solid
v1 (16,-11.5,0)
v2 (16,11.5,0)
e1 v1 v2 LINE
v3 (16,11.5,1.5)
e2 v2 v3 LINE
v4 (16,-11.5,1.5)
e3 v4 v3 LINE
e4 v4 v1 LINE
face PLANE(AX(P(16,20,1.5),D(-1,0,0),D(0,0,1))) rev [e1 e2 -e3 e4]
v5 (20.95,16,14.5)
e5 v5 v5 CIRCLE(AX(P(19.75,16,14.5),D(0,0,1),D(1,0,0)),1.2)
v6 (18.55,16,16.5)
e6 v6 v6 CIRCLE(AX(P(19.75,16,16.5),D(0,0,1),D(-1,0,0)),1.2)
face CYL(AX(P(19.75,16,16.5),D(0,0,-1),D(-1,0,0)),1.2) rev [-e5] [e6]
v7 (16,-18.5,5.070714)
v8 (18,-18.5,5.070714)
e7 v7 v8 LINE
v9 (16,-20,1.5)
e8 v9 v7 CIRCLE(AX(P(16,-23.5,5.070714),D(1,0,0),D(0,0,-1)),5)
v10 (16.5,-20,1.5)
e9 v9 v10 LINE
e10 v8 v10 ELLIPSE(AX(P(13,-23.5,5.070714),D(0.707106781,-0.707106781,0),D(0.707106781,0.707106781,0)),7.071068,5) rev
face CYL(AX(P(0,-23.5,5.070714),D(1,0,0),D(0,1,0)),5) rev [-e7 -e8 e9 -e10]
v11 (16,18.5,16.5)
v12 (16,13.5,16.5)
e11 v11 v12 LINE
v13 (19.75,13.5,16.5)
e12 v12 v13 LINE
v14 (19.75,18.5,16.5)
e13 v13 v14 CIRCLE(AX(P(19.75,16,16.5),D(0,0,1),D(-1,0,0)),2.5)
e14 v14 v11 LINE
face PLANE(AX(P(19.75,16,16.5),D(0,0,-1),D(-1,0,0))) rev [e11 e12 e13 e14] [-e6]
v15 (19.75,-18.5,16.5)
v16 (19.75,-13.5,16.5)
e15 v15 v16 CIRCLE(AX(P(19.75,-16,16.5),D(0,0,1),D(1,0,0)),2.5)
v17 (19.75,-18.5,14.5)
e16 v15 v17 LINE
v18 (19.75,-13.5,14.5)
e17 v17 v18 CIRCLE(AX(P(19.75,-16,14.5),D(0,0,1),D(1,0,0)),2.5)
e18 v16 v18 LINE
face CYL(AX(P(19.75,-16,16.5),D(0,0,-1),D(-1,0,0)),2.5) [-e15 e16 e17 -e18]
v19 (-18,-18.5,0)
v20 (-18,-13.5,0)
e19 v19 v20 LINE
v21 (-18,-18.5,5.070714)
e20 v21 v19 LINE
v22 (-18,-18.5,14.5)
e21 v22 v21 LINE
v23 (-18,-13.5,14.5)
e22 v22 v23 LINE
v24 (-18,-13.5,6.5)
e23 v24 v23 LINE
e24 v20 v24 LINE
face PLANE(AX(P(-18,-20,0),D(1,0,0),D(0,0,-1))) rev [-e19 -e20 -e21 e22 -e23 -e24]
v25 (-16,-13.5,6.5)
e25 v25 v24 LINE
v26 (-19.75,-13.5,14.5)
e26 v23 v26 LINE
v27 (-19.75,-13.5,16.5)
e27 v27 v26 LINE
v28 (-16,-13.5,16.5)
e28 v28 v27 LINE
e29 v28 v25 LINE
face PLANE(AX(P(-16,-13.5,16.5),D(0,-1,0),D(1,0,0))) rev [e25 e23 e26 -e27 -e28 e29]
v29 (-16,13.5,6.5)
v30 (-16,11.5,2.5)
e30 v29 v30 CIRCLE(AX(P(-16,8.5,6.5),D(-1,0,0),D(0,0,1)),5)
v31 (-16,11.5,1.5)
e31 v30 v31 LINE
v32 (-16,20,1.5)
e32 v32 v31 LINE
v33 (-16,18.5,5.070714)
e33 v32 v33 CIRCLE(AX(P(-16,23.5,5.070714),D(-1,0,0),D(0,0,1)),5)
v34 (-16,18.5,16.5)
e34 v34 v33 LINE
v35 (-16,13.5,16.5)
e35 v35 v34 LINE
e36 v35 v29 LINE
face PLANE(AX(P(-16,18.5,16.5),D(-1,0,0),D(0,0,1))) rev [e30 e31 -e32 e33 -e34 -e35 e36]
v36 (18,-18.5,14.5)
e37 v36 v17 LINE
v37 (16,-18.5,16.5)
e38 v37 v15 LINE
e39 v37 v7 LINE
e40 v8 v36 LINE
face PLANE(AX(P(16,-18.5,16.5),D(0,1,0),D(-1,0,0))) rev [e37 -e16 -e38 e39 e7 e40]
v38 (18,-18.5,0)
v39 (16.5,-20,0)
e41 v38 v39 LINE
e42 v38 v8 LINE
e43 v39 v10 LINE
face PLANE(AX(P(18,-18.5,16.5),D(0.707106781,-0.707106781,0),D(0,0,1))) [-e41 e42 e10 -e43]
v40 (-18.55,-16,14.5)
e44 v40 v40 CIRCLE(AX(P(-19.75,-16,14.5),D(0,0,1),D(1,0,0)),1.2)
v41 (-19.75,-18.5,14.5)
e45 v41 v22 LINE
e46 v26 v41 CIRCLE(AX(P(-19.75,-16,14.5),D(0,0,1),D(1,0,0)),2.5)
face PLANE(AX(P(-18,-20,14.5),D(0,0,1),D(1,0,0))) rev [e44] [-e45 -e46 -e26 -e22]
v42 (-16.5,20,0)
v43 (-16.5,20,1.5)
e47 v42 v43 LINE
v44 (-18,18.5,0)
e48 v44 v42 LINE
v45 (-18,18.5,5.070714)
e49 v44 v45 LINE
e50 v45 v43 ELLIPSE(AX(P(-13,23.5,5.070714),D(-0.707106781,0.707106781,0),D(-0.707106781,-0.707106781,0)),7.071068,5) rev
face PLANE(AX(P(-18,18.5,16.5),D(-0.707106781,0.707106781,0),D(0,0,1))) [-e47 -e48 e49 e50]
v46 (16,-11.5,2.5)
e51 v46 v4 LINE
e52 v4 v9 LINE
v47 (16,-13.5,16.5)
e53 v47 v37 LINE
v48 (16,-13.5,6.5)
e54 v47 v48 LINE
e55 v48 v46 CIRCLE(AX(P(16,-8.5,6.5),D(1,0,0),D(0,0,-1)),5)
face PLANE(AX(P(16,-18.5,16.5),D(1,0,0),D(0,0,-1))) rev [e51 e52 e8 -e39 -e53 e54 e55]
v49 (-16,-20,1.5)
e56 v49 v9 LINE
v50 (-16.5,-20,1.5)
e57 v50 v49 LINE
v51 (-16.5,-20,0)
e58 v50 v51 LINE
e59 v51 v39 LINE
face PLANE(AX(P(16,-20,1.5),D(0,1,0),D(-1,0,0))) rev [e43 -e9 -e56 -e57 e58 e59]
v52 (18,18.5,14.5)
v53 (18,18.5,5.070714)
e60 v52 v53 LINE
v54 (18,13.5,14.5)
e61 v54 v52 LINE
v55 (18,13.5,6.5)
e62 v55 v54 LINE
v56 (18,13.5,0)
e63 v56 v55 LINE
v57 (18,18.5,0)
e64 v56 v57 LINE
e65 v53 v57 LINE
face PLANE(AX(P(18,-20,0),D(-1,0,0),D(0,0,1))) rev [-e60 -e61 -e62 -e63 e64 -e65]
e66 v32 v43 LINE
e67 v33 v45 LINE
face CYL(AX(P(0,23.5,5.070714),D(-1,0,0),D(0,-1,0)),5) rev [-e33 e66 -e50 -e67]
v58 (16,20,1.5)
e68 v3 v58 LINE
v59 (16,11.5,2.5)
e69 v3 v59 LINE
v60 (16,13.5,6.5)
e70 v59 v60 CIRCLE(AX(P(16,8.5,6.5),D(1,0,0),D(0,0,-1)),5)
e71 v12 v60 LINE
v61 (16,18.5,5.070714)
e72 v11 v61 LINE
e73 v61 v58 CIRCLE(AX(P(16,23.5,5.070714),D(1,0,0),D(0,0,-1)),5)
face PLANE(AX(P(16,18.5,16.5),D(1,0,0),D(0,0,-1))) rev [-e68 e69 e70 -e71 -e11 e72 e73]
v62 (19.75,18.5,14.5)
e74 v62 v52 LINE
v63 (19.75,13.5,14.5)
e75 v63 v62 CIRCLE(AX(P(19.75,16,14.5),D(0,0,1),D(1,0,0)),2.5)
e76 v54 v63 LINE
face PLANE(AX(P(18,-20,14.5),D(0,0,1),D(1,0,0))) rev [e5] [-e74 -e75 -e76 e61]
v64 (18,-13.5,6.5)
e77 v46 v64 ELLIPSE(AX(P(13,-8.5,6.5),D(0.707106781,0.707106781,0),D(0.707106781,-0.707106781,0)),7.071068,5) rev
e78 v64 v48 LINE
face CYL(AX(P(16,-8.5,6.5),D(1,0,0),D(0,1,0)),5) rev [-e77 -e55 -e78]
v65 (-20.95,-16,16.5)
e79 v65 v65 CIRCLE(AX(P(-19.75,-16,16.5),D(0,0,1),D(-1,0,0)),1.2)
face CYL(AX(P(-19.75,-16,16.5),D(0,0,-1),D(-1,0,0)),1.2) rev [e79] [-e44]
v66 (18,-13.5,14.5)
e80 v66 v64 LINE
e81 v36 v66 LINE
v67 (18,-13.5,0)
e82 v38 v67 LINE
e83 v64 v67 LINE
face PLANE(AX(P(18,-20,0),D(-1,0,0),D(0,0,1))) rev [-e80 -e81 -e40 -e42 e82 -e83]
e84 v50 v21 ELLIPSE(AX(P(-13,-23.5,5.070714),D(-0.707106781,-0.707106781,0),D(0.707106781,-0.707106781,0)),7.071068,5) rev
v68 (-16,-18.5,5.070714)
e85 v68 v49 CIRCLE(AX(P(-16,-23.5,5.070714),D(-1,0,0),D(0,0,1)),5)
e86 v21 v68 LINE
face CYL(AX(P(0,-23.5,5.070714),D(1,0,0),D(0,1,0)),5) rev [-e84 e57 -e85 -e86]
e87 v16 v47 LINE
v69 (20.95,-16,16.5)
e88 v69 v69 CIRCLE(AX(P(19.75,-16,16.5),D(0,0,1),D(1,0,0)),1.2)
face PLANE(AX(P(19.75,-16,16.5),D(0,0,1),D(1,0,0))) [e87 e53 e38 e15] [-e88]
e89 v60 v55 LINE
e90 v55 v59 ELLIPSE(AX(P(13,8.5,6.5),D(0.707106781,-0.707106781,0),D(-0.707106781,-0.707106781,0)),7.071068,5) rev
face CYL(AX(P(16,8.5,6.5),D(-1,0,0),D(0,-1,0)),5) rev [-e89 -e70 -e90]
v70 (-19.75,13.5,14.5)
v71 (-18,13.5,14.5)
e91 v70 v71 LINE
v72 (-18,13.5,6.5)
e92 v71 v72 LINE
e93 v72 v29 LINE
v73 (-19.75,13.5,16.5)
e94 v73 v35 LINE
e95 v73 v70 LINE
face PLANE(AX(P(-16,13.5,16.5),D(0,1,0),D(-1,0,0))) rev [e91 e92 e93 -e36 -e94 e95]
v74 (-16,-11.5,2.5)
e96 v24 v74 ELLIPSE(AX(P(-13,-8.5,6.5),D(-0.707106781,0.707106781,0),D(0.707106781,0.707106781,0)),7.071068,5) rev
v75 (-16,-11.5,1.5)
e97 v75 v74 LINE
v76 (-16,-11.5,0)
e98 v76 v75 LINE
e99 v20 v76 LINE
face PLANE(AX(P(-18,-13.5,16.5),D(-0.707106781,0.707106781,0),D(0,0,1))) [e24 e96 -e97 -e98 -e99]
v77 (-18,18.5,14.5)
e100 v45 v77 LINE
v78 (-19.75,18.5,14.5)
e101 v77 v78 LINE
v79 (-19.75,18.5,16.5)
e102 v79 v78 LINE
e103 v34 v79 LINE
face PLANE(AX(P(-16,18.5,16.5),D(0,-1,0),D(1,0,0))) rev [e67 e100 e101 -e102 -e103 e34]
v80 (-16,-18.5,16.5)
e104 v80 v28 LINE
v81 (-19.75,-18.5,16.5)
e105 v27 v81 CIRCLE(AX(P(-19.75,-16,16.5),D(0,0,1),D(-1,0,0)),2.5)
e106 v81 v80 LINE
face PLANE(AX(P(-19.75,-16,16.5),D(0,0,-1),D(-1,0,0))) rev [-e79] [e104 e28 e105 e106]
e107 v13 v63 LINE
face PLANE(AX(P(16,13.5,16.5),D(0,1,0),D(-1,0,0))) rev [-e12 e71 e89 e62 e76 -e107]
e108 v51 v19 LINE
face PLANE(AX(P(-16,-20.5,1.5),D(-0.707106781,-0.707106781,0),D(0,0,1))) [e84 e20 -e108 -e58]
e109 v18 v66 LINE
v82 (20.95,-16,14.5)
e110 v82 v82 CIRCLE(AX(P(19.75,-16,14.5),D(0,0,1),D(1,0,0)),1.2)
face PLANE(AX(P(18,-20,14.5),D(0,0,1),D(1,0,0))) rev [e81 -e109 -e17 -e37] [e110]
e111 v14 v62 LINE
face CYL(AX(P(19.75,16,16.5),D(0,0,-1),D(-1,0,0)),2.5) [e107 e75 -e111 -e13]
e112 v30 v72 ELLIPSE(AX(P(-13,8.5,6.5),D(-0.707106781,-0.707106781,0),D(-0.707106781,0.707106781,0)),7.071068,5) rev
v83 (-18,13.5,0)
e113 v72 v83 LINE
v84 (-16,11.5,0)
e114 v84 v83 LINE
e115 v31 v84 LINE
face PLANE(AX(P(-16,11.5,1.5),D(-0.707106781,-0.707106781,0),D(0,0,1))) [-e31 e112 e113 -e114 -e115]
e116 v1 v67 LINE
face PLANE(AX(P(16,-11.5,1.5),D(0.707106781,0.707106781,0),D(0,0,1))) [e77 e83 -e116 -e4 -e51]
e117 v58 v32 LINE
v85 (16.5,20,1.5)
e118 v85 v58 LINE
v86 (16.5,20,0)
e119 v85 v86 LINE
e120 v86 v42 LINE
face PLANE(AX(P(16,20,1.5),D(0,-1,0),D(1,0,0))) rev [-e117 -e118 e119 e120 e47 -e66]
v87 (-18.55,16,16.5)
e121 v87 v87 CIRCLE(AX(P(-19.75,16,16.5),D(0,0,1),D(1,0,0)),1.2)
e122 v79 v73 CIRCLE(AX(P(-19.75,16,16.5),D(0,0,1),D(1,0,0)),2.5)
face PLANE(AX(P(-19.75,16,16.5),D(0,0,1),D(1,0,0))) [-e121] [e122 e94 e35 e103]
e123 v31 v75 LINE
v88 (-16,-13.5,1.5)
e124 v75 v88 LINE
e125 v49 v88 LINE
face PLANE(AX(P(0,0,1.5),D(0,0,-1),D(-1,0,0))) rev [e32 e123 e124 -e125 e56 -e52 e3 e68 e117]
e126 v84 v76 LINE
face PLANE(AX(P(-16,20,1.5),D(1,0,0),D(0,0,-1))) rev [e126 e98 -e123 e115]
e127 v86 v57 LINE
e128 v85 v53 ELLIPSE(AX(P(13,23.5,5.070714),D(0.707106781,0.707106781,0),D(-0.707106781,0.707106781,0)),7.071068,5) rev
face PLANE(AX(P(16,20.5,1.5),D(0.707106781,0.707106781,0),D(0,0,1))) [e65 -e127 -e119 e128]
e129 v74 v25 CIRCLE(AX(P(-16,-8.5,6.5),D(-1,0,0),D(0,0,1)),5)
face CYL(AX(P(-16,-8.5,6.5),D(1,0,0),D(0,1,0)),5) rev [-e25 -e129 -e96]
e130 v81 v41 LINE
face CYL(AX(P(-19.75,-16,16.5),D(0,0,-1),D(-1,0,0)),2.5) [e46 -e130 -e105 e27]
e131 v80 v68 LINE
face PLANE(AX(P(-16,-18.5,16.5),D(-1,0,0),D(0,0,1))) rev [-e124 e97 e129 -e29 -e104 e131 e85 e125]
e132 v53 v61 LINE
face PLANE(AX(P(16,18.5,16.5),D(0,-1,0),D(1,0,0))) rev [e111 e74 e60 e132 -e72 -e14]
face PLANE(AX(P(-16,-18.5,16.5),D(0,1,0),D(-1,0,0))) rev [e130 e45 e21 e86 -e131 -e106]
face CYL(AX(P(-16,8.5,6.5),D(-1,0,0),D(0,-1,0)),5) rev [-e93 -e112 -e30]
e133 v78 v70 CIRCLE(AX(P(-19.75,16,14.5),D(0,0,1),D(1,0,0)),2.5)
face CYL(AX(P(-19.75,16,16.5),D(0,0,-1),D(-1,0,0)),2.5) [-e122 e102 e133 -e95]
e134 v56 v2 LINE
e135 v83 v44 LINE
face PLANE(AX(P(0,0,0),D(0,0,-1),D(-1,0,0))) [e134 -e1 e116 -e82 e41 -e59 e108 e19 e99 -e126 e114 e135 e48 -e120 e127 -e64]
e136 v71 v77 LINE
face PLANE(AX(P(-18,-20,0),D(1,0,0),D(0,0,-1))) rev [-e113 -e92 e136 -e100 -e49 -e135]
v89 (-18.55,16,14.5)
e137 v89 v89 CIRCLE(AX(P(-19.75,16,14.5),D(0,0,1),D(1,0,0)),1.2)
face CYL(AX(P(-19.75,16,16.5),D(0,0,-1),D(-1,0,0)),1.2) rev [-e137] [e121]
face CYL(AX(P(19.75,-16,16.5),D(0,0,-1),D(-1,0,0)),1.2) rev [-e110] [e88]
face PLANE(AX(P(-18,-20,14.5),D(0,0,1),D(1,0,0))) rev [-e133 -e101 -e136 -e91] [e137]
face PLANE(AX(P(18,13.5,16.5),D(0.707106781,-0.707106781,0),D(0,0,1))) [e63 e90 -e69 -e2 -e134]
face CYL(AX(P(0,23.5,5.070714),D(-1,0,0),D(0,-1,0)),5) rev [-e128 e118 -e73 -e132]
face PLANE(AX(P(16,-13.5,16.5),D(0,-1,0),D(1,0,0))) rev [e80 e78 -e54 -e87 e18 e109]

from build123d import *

# Parameters (mm, degrees)
SKETCH1_W               = 32
SKETCH1_H               = 40
BOSS_EXTRUDE1_DEPTH     = 1.5
SKETCH2_R               = 1.2
BOSS_EXTRUDE2_DEPTH     = 16.5
CUT_EXTRUDE1_DEPTH      = 35.165955277
CUT_EXTRUDE1_DEPTH_BACK = 35.165955277
SKETCH4_W               = 10
SKETCH4_H               = 14.5
CHAMFER1_SIZE           = 2
FILLET1_R               = 5


with BuildPart() as part:
    # Sketch1 → Boss-Extrude1 (new body)
    with BuildSketch(Plane.XY):
        Rectangle(SKETCH1_W, SKETCH1_H)
    extrude(amount=BOSS_EXTRUDE1_DEPTH)

    # Sketch2 → Boss-Extrude2 (add)
    # profile 1 of 4: a face of its own
    with BuildSketch(Plane.XY):
        with BuildLine():
            Line((-16, 18.5), (-19.75, 18.5))
            ThreePointArc((-19.75, 18.5), (-22.25, 16), (-19.75, 13.5))
            Line((-19.75, 13.5), (-16, 13.5))
            Line((-16, 13.5), (-16, 18.5))
        make_face()
        with Locations((-19.75, 16)):
            Circle(SKETCH2_R, mode=Mode.SUBTRACT)
    # profile 2 of 4: a face of its own
    with BuildSketch(Plane.XY):
        with BuildLine():
            Line((16, 18.5), (16, 13.5))
            Line((16, 13.5), (19.75, 13.5))
            ThreePointArc((19.75, 13.5), (22.25, 16), (19.75, 18.5))
            Line((19.75, 18.5), (16, 18.5))
        make_face()
        with Locations(Location((19.75, 16, 0), (0, 0, 180))):
            Circle(SKETCH2_R, mode=Mode.SUBTRACT)
    # profile 3 of 4: a face of its own
    with BuildSketch(Plane.XY):
        with BuildLine():
            Line((16, -18.5), (19.75, -18.5))
            ThreePointArc((19.75, -18.5), (22.25, -16), (19.75, -13.5))
            Line((19.75, -13.5), (16, -13.5))
            Line((16, -13.5), (16, -18.5))
        make_face()
        with Locations((19.75, -16)):
            Circle(SKETCH2_R, mode=Mode.SUBTRACT)
    # profile 4 of 4: a face of its own
    with BuildSketch(Plane.XY):
        with BuildLine():
            Line((-16, -18.5), (-16, -13.5))
            Line((-16, -13.5), (-19.75, -13.5))
            ThreePointArc((-19.75, -13.5), (-22.25, -16), (-19.75, -18.5))
            Line((-19.75, -18.5), (-16, -18.5))
        make_face()
        with Locations(Location((-19.75, -16, 0), (0, 0, 180))):
            Circle(SKETCH2_R, mode=Mode.SUBTRACT)
    extrude(amount=BOSS_EXTRUDE2_DEPTH)

    # Sketch4 → Cut-Extrude1 (cut, two sides: drawn at the far end of the back side and taken through both)
    with BuildSketch(Plane(origin=(0, 0, 0), x_dir=(1, 0, 0), z_dir=(0, 1, 0)).offset(-CUT_EXTRUDE1_DEPTH_BACK)):
        with Locations((-23, -7.25)):
            Rectangle(SKETCH4_W, SKETCH4_H)
        with Locations((23, -7.25)):
            Rectangle(SKETCH4_W, SKETCH4_H)
    extrude(amount=CUT_EXTRUDE1_DEPTH + CUT_EXTRUDE1_DEPTH_BACK, mode=Mode.SUBTRACT)

    # Chamfer1
    # the kernel refuses this chamfer: 2 mm, written as the material it adds along each edge
    with BuildSketch(Plane(origin=(-16, -13.5, 0), x_dir=(-1, 0, 0), z_dir=(0, 0, 1)), Plane(origin=(-16, 13.5, 0), x_dir=(0, -1, 0), z_dir=(0, 0, 1)), Plane(origin=(16, -13.5, 0), x_dir=(0, 1, 0), z_dir=(0, 0, 1)), Plane(origin=(16, 13.5, 0), x_dir=(1, 0, 0), z_dir=(0, 0, 1))) as chamfer1_piece_1:
        Polygon((CHAMFER1_SIZE, 0), (0, -CHAMFER1_SIZE), (0, 0), align=None)
    extrude(amount=1.5)
    with BuildSketch(Plane(origin=(-16, -18.5, 0), x_dir=(0, -1, 0), z_dir=(0, 0, 1))) as chamfer1_piece_2_section:
        Polygon((CHAMFER1_SIZE, 0), (0, -CHAMFER1_SIZE), (0, 0), align=None)
    chamfer1_piece_2 = extrude(amount=1.5, mode=Mode.PRIVATE)
    chamfer1_piece_2 = split(chamfer1_piece_2, bisect_by=Plane(origin=(-16, -20, 0), z_dir=(0, 1, 0)), keep=Keep.TOP, mode=Mode.PRIVATE)
    add(chamfer1_piece_2)
    with BuildSketch(Plane(origin=(-16, 18.5, 0), x_dir=(0, 1, 0), z_dir=(0, 0, 1))) as chamfer1_piece_3_section:
        Polygon((CHAMFER1_SIZE, 0), (0, CHAMFER1_SIZE), (0, 0), align=None)
    chamfer1_piece_3 = extrude(amount=1.5, mode=Mode.PRIVATE)
    chamfer1_piece_3 = split(chamfer1_piece_3, bisect_by=Plane(origin=(-16, 20, 0), z_dir=(0, -1, 0)), keep=Keep.TOP, mode=Mode.PRIVATE)
    add(chamfer1_piece_3)
    with BuildSketch(Plane(origin=(16, -18.5, 0), x_dir=(1, 0, 0), z_dir=(0, 0, 1))) as chamfer1_piece_4_section:
        Polygon((CHAMFER1_SIZE, 0), (0, -CHAMFER1_SIZE), (0, 0), align=None)
    chamfer1_piece_4 = extrude(amount=1.5, mode=Mode.PRIVATE)
    chamfer1_piece_4 = split(chamfer1_piece_4, bisect_by=Plane(origin=(16, -20, 0), z_dir=(0, 1, 0)), keep=Keep.TOP, mode=Mode.PRIVATE)
    add(chamfer1_piece_4)
    with BuildSketch(Plane(origin=(16, 18.5, 0), x_dir=(0, 1, 0), z_dir=(0, 0, 1))) as chamfer1_piece_5_section:
        Polygon((CHAMFER1_SIZE, 0), (0, -CHAMFER1_SIZE), (0, 0), align=None)
    chamfer1_piece_5 = extrude(amount=1.5, mode=Mode.PRIVATE)
    chamfer1_piece_5 = split(chamfer1_piece_5, bisect_by=Plane(origin=(16, 20, 0), z_dir=(0, -1, 0)), keep=Keep.TOP, mode=Mode.PRIVATE)
    add(chamfer1_piece_5)

    # Fillet1
    # the kernel refuses this fillet: 5 mm, written as the material it adds along each edge
    with BuildSketch(Plane(origin=(-16, -13.5, 1.5), x_dir=(0, 0, 1), z_dir=(-1, 0, 0))) as fillet1_piece_1_section:
        with BuildLine():
            CenterArc((FILLET1_R, FILLET1_R), FILLET1_R, 180, 90)
            Line((0, FILLET1_R), (0, 0))
            Line((0, 0), (FILLET1_R, 0))
        make_face()
    fillet1_piece_1 = extrude(amount=14.5, mode=Mode.PRIVATE)
    fillet1_piece_1 = split(fillet1_piece_1, bisect_by=Plane(origin=(-17, -12.5, 1.5), z_dir=(0.7071067811865476, -0.7071067811865476, 0)), keep=Keep.TOP, mode=Mode.PRIVATE)
    add(fillet1_piece_1)
    with BuildSketch(Plane(origin=(-26.926785536, -18.5, 1.5), x_dir=(0, 0, 1), z_dir=(1, 0, 0))) as fillet1_piece_2_section:
        with BuildLine():
            CenterArc((3.570714214, 5), FILLET1_R, 224.427004001, 45.572995999)
            Line((0, 1.5), (0, 0))
            Line((0, 0), (3.570714214, 0))
        make_face()
    fillet1_piece_2 = extrude(amount=10.926785536, mode=Mode.PRIVATE)
    fillet1_piece_2 = split(fillet1_piece_2, bisect_by=Plane(origin=(-22.463392768, -14.036607232, 1.5), z_dir=(0.7071067811865476, 0.7071067811865476, 0)), keep=Keep.TOP, mode=Mode.PRIVATE)
    add(fillet1_piece_2)
    with BuildSketch(Plane(origin=(-30.5, 13.5, 1.5), x_dir=(0, 0, 1), z_dir=(1, 0, 0))) as fillet1_piece_3_section:
        with BuildLine():
            CenterArc((FILLET1_R, FILLET1_R), FILLET1_R, 180, 90)
            Line((0, FILLET1_R), (0, 0))
            Line((0, 0), (FILLET1_R, 0))
        make_face()
    fillet1_piece_3 = extrude(amount=14.5, mode=Mode.PRIVATE)
    fillet1_piece_3 = split(fillet1_piece_3, bisect_by=Plane(origin=(-24.25, 19.75, 1.5), z_dir=(0.7071067811865476, 0.7071067811865476, 0)), keep=Keep.TOP, mode=Mode.PRIVATE)
    add(fillet1_piece_3)
    with BuildSketch(Plane(origin=(-26.926785536, 18.5, 1.5), x_dir=(0, 0, 1), z_dir=(1, 0, 0))) as fillet1_piece_4_section:
        with BuildLine():
            CenterArc((3.570714214, -5), FILLET1_R, 90, 45.572995999)
            Line((0, -1.5), (0, 0))
            Line((0, 0), (3.570714214, 0))
        make_face()
    fillet1_piece_4 = extrude(amount=10.926785536, mode=Mode.PRIVATE)
    fillet1_piece_4 = split(fillet1_piece_4, bisect_by=Plane(origin=(-22.463392768, 14.036607232, 1.5), z_dir=(0.7071067811865476, -0.7071067811865476, 0)), keep=Keep.TOP, mode=Mode.PRIVATE)
    add(fillet1_piece_4)
    with BuildSketch(Plane(origin=(16, -18.5, 1.5), x_dir=(0, 0, 1), z_dir=(1, 0, 0))) as fillet1_piece_5_section:
        with BuildLine():
            CenterArc((3.570714214, 5), FILLET1_R, 224.427004001, 45.572995999)
            Line((0, 1.5), (0, 0))
            Line((0, 0), (3.570714214, 0))
        make_face()
    fillet1_piece_5 = extrude(amount=10.926785536, mode=Mode.PRIVATE)
    fillet1_piece_5 = split(fillet1_piece_5, bisect_by=Plane(origin=(17, -19.5, 1.5), z_dir=(-0.7071067811865476, 0.7071067811865476, 0)), keep=Keep.TOP, mode=Mode.PRIVATE)
    add(fillet1_piece_5)
    with BuildSketch(Plane(origin=(30.5, -13.5, 1.5), x_dir=(0, 0, 1), z_dir=(-1, 0, 0))) as fillet1_piece_6_section:
        with BuildLine():
            CenterArc((FILLET1_R, FILLET1_R), FILLET1_R, 180, 90)
            Line((0, FILLET1_R), (0, 0))
            Line((0, 0), (FILLET1_R, 0))
        make_face()
    fillet1_piece_6 = extrude(amount=14.5, mode=Mode.PRIVATE)
    fillet1_piece_6 = split(fillet1_piece_6, bisect_by=Plane(origin=(24.25, -19.75, 1.5), z_dir=(-0.7071067811865476, -0.7071067811865476, 0)), keep=Keep.TOP, mode=Mode.PRIVATE)
    add(fillet1_piece_6)
    with BuildSketch(Plane(origin=(16, 13.5, 1.5), x_dir=(0, -1, 0), z_dir=(1, 0, 0))) as fillet1_piece_7_section:
        with BuildLine():
            CenterArc((FILLET1_R, -FILLET1_R), FILLET1_R, 90, 90)
            Line((0, -FILLET1_R), (0, 0))
            Line((0, 0), (FILLET1_R, 0))
        make_face()
    fillet1_piece_7 = extrude(amount=14.5, mode=Mode.PRIVATE)
    fillet1_piece_7 = split(fillet1_piece_7, bisect_by=Plane(origin=(17, 12.5, 1.5), z_dir=(-0.7071067811865476, 0.7071067811865476, 0)), keep=Keep.TOP, mode=Mode.PRIVATE)
    add(fillet1_piece_7)
    with BuildSketch(Plane(origin=(26.926785536, 18.5, 1.5), x_dir=(0, 1, 0), z_dir=(-1, 0, 0))) as fillet1_piece_8_section:
        with BuildLine():
            CenterArc((5, -3.570714214), FILLET1_R, 134.427004001, 45.572995999)
            Line((0, -3.570714214), (0, 0))
            Line((0, 0), (1.5, 0))
        make_face()
    fillet1_piece_8 = extrude(amount=10.926785536, mode=Mode.PRIVATE)
    fillet1_piece_8 = split(fillet1_piece_8, bisect_by=Plane(origin=(22.463392768, 14.036607232, 1.5), z_dir=(-0.7071067811865476, -0.7071067811865476, 0)), keep=Keep.TOP, mode=Mode.PRIVATE)
    add(fillet1_piece_8)


solid = part.part
